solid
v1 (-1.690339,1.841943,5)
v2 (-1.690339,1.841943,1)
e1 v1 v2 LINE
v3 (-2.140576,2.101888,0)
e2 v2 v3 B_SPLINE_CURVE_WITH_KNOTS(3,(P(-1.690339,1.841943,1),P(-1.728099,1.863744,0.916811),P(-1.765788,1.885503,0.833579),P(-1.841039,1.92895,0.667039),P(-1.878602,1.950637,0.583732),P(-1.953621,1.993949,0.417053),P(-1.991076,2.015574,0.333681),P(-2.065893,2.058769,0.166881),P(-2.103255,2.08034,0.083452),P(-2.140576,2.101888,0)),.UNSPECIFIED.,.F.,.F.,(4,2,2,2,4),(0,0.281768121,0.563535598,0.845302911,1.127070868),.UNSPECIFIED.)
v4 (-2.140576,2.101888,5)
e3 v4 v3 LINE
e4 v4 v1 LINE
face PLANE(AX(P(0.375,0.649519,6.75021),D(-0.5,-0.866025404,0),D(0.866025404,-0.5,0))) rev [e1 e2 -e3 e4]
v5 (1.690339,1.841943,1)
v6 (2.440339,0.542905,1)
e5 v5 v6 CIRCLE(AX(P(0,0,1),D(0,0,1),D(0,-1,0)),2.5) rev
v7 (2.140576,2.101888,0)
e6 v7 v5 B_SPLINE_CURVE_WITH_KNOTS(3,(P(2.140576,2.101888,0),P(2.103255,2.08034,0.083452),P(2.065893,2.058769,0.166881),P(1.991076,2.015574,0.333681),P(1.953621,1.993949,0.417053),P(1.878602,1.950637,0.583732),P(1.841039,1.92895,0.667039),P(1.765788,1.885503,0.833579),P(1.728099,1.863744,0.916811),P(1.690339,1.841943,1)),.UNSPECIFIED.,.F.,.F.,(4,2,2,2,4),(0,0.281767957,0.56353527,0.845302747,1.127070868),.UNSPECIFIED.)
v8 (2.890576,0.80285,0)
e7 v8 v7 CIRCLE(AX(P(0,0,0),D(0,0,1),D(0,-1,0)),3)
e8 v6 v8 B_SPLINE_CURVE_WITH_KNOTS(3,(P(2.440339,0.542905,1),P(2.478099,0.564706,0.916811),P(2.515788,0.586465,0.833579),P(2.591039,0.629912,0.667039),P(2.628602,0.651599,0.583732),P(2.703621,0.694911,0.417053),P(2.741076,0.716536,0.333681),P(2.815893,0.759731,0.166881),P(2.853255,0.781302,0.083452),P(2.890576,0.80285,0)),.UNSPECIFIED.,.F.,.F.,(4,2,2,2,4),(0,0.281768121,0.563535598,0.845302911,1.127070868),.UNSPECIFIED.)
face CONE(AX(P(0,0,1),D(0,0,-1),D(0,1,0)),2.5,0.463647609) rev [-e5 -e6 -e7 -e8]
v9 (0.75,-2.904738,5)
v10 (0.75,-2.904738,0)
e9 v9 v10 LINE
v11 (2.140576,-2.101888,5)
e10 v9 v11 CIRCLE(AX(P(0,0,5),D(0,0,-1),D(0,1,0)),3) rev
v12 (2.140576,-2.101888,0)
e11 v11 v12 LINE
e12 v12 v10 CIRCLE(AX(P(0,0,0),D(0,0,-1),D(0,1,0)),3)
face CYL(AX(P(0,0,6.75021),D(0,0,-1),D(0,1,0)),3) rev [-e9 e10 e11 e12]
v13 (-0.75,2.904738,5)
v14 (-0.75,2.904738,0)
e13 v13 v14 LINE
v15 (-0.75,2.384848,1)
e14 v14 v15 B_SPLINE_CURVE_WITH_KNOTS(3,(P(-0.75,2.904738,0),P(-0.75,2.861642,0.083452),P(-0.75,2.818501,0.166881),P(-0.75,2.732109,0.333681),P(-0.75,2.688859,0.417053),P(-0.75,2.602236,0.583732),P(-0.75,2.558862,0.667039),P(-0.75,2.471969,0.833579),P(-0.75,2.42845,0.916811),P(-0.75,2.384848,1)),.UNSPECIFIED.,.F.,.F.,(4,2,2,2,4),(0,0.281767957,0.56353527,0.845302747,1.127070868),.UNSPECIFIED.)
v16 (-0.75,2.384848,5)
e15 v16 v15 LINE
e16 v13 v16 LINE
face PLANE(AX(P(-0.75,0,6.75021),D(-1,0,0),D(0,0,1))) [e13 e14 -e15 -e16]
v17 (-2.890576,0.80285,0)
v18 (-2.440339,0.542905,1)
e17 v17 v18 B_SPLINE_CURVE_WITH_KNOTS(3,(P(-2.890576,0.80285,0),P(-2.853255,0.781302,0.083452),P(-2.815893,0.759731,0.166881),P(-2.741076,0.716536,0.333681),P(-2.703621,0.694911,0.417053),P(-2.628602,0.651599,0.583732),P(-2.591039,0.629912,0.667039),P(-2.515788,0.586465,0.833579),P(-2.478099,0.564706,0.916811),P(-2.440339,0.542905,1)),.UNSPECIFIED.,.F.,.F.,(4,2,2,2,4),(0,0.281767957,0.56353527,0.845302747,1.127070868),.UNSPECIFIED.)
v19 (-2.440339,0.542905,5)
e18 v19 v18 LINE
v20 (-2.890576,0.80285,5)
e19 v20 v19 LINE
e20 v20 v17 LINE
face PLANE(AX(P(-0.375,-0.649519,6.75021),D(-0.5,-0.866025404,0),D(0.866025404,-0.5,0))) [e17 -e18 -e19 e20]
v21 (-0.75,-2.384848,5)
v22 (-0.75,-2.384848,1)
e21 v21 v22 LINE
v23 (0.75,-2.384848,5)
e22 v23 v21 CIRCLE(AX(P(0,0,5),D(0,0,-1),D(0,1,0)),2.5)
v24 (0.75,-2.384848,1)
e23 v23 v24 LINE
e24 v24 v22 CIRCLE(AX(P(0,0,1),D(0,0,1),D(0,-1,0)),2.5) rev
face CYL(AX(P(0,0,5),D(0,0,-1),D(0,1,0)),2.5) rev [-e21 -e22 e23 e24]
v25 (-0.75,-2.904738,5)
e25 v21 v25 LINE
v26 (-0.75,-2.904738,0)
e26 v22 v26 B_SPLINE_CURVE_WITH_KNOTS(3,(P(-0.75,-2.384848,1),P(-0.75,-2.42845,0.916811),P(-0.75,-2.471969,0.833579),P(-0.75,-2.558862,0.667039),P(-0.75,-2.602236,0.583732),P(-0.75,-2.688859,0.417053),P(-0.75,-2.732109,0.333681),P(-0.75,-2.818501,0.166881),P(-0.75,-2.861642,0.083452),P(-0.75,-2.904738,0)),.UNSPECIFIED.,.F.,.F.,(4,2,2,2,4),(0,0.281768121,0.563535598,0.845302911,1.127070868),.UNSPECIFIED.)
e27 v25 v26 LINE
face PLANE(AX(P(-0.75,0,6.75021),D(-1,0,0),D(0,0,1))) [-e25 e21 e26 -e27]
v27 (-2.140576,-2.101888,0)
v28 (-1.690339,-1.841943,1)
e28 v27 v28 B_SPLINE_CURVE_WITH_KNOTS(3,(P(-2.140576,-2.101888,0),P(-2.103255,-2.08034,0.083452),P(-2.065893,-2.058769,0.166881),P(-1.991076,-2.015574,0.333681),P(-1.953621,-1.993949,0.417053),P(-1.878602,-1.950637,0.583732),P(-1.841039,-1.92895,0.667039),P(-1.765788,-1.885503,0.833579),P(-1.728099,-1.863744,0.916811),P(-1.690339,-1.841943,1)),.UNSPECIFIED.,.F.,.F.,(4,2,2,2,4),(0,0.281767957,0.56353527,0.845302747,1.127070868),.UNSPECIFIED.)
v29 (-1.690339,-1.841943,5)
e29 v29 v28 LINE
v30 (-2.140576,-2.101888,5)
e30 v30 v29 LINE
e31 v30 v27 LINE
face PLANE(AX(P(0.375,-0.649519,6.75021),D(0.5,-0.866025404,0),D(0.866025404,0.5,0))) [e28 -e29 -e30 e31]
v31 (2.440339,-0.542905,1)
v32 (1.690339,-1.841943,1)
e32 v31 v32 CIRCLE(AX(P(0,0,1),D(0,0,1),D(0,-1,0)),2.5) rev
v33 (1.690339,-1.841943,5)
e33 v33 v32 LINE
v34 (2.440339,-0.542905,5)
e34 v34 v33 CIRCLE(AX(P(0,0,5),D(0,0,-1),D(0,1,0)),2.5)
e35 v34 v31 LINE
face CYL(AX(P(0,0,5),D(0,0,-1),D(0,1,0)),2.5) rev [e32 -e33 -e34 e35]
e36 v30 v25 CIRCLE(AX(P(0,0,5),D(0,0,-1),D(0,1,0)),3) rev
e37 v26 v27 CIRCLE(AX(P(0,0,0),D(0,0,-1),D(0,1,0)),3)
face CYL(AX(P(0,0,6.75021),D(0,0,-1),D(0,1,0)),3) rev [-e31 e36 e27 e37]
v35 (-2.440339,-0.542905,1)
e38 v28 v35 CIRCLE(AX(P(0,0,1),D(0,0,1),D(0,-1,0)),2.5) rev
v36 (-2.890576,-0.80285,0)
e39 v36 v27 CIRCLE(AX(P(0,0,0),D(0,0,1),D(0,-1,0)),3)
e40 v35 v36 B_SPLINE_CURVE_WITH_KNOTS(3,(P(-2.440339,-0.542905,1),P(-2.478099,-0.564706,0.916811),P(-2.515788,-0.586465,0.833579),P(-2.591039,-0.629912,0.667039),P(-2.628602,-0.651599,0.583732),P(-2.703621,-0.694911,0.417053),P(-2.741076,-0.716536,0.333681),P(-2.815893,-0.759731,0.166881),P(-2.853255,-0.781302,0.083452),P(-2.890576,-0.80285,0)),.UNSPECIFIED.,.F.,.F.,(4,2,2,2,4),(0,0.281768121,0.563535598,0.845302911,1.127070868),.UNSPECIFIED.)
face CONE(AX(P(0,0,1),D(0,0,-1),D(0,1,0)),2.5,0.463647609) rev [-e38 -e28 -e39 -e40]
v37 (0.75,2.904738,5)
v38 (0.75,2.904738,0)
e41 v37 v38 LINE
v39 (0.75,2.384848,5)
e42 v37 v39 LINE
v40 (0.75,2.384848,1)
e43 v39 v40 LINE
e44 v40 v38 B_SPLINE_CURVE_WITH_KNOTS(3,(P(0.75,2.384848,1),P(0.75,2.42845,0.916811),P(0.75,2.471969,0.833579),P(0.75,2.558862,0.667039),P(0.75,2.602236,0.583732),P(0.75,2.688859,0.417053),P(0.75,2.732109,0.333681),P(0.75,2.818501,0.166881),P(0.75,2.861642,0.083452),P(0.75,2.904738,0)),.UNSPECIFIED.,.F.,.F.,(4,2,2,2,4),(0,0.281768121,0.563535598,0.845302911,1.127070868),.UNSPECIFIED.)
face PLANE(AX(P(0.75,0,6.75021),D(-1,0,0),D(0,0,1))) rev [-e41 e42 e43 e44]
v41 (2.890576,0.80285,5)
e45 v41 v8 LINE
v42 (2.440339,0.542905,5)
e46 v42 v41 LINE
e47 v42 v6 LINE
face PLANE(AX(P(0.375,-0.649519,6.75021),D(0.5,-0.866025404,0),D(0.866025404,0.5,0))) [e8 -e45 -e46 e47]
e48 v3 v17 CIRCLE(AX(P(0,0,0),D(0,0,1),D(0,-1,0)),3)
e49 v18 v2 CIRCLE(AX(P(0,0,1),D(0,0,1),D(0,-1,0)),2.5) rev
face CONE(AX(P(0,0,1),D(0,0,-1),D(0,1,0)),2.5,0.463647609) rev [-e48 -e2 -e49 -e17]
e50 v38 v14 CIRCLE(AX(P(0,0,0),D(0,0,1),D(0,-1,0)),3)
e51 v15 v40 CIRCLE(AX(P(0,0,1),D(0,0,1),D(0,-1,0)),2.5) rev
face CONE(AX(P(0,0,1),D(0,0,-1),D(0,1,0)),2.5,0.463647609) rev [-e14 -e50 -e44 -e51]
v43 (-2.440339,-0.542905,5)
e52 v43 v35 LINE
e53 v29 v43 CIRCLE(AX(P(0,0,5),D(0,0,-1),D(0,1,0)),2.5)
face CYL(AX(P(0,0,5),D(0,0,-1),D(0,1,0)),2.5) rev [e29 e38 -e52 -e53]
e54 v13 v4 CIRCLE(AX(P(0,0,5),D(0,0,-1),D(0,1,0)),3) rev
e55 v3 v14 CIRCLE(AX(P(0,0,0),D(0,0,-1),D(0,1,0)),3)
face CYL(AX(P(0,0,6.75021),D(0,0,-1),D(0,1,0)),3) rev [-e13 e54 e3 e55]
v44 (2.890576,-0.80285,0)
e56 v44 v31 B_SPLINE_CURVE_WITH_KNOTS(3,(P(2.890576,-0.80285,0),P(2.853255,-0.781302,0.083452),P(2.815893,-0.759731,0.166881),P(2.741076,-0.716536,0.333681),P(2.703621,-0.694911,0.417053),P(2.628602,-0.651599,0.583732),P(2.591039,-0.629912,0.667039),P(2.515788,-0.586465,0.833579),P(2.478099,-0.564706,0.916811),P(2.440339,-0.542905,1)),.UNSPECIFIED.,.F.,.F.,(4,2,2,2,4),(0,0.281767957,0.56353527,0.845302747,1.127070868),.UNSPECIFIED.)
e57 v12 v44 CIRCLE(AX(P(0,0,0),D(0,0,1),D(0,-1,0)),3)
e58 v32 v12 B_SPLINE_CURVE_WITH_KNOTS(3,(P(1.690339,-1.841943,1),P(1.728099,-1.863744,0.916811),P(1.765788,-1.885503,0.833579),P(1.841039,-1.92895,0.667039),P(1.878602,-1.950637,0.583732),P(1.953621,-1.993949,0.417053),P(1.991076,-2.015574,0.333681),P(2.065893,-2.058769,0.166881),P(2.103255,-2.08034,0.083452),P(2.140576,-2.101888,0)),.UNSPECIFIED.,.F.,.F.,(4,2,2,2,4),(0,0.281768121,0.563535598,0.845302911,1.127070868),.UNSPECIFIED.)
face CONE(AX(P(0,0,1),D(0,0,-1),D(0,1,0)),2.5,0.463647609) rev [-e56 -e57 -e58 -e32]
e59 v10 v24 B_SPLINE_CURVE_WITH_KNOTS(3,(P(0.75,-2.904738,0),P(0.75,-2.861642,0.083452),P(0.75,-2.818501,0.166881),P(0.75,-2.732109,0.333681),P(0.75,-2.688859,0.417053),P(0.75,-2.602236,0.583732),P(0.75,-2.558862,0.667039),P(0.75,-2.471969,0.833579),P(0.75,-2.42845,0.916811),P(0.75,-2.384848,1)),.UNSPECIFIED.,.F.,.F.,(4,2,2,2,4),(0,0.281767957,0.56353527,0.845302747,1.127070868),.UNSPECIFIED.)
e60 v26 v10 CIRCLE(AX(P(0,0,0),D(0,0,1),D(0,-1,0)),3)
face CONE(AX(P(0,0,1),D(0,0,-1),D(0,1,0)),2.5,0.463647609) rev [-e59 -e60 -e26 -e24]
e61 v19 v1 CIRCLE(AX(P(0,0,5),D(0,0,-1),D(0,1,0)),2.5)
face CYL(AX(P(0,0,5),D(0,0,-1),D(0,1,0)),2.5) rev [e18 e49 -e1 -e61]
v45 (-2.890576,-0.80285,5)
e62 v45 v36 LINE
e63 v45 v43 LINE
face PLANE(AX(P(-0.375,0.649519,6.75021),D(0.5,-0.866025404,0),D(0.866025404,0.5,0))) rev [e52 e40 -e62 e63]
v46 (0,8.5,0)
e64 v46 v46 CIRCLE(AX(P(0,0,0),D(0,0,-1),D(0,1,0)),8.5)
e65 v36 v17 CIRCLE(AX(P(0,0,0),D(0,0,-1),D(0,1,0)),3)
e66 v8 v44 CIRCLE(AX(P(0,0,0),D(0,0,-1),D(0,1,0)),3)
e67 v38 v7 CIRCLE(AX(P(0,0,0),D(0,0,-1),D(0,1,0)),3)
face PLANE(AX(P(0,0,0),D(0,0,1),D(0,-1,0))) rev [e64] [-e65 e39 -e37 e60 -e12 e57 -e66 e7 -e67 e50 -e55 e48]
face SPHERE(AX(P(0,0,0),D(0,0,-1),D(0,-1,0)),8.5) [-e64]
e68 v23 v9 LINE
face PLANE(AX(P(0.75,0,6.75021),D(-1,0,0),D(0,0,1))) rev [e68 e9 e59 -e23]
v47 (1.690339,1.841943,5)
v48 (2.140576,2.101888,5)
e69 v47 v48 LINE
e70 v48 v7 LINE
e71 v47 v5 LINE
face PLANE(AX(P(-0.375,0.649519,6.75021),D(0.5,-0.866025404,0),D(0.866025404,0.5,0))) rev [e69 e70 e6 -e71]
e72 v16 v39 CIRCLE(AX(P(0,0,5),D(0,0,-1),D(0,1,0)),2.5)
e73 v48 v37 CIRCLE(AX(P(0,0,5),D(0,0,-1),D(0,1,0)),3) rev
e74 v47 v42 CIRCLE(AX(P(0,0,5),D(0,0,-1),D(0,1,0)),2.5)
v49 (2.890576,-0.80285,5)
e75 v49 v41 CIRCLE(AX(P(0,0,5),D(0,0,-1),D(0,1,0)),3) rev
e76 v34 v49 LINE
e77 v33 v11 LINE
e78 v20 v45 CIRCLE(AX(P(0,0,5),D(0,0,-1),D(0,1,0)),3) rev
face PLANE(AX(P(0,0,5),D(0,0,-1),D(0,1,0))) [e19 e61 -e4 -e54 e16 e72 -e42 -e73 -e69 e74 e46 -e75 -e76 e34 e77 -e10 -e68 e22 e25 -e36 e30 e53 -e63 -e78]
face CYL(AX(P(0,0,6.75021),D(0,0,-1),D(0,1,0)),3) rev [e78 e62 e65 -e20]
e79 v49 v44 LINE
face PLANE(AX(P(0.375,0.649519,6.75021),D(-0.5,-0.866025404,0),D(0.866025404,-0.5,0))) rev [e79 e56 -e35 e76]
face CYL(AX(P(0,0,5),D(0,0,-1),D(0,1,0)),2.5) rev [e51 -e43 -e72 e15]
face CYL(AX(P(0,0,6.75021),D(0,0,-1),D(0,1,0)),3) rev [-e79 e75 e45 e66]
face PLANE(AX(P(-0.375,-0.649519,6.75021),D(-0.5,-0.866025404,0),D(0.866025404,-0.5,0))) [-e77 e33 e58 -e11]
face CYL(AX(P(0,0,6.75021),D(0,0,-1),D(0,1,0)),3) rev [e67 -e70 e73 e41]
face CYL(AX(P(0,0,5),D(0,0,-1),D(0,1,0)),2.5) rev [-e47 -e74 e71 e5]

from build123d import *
from OCP.BRepFilletAPI import BRepFilletAPI_MakeChamfer

# Parameters (mm, degrees)
SKETCH2_R          = 2.5
CUT_EXTRUDE1_DEPTH = 5
CUT_EXTRUDE2_DEPTH = 5
CHAMFER2_SIZE      = 0.5
CHAMFER2_SIZE_2    = 1


with BuildPart() as part:
    # Sketch1 → Revolve1 (revolve)
    with BuildSketch(Plane(origin=(0, 0, 0), x_dir=(0, 0, -1), z_dir=(1, 0, 0))):
        with BuildLine():
            Line((0, 0), (0, -8.5))
            ThreePointArc((0, -8.5), (-6.01040764, -6.01040764), (-8.5, 0))
            Line((-8.5, 0), (0, 0))
        make_face()
    revolve(axis=Axis((0, 0, 0), (0, 0, 1)))

    # Sketch2 → Cut-Extrude1 (cut)
    with BuildSketch(Plane(origin=(0, 0, 0), x_dir=(-1, 0, 0), z_dir=(0, 0, -1))):
        with Locations(Location((0, 0, 0), (0, 0, 90))):
            Circle(SKETCH2_R)
    extrude(amount=-CUT_EXTRUDE1_DEPTH, mode=Mode.SUBTRACT)

    # Sketch3 → Cut-Extrude2 (cut)
    with BuildSketch(Plane(origin=(0, 0, 0), x_dir=(-1, 0, 0), z_dir=(0, 0, -1))):
        with BuildLine():
            ThreePointArc((-0.75, 2.90473751), (-1.5, 2.598076211), (-2.140576475, 2.101887808))
            Line((-2.140576475, 2.101887808), (-1.690338955, 1.841943055))
            ThreePointArc((-1.690338955, 1.841943055), (-1.25, 2.165063509), (-0.75, 2.384848004))
            Line((-0.75, 2.384848004), (-0.75, 2.90473751))
        make_face()
        with BuildLine():
            Line((1.690338955, 1.841943055), (2.140576475, 2.101887808))
            ThreePointArc((2.140576475, 2.101887808), (1.5, 2.598076211), (0.75, 2.90473751))
            Line((0.75, 2.90473751), (0.75, 2.384848004))
            ThreePointArc((0.75, 2.384848004), (1.25, 2.165063509), (1.690338955, 1.841943055))
        make_face()
        with BuildLine():
            Line((2.440338955, -0.542904949), (2.890576475, -0.802849702))
            ThreePointArc((2.890576475, -0.802849702), (2.972518244, -0.405136135), (3, 0))
            ThreePointArc((3, 0), (2.972518244, 0.405136135), (2.890576475, 0.802849702))
            Line((2.890576475, 0.802849702), (2.440338955, 0.542904949))
            ThreePointArc((2.440338955, 0.542904949), (2.485039978, 0.273086627), (2.5, 0))
            ThreePointArc((2.5, 0), (2.485039978, -0.273086627), (2.440338955, -0.542904949))
        make_face()
        with BuildLine():
            Line((0.75, -2.384848004), (0.75, -2.90473751))
            ThreePointArc((0.75, -2.90473751), (1.5, -2.598076211), (2.140576475, -2.101887808))
            Line((2.140576475, -2.101887808), (1.690338955, -1.841943055))
            ThreePointArc((1.690338955, -1.841943055), (1.25, -2.165063509), (0.75, -2.384848004))
        make_face()
        with BuildLine():
            ThreePointArc((-2.140576475, -2.101887808), (-1.5, -2.598076211), (-0.75, -2.90473751))
            Line((-0.75, -2.90473751), (-0.75, -2.384848004))
            ThreePointArc((-0.75, -2.384848004), (-1.25, -2.165063509), (-1.690338955, -1.841943055))
            Line((-1.690338955, -1.841943055), (-2.140576475, -2.101887808))
        make_face()
        with BuildLine():
            ThreePointArc((-2.890576475, 0.802849702), (-3, 0), (-2.890576475, -0.802849702))
            Line((-2.890576475, -0.802849702), (-2.440338955, -0.542904949))
            ThreePointArc((-2.440338955, -0.542904949), (-2.5, 0), (-2.440338955, 0.542904949))
            Line((-2.440338955, 0.542904949), (-2.890576475, 0.802849702))
        make_face()
    extrude(amount=-CUT_EXTRUDE2_DEPTH, mode=Mode.SUBTRACT)

    # Chamfer2
    chamfer2_edges_1 = [part.edges().sort_by_distance(p)[0] for p in [
        (-2.165063509, 1.25, 0),
    ]]
    chamfer2_side_1 = [part.faces().sort_by_distance(p)[0] for p in [
        (-2.173723763, 1.255, 0),
    ]]
    chamfer2_edges_2 = [part.edges().sort_by_distance(p)[0] for p in [
        (2.165063509, -1.25, 0),
    ]]
    chamfer2_side_2 = [part.faces().sort_by_distance(p)[0] for p in [
        (2.173723763, -1.255, 0),
    ]]
    chamfer2_edges_3 = [part.edges().sort_by_distance(p)[0] for p in [
        (0, 2.5, 0),
    ]]
    chamfer2_side_3 = [part.faces().sort_by_distance(p)[0] for p in [
        (0, 2.51, 0),
    ]]
    chamfer2_edges_4 = [part.edges().sort_by_distance(p)[0] for p in [
        (0, -2.5, 0),
    ]]
    chamfer2_side_4 = [part.faces().sort_by_distance(p)[0] for p in [
        (0, -2.51, 0),
    ]]
    chamfer2_edges_5 = [part.edges().sort_by_distance(p)[0] for p in [
        (2.165063509, 1.25, 0),
    ]]
    chamfer2_side_5 = [part.faces().sort_by_distance(p)[0] for p in [
        (2.173723763, 1.255, 0),
    ]]
    chamfer2_edges_6 = [part.edges().sort_by_distance(p)[0] for p in [
        (-2.165063509, -1.25, 0),
    ]]
    chamfer2_side_6 = [part.faces().sort_by_distance(p)[0] for p in [
        (-2.173723763, -1.255, 0),
    ]]
    chamfer2 = BRepFilletAPI_MakeChamfer(part.part.solid().wrapped)
    for e in chamfer2_edges_1:
        chamfer2.Add(CHAMFER2_SIZE - 0.0001, CHAMFER2_SIZE_2 - 0.0001, e.wrapped, chamfer2_side_1[0].wrapped)
    for e in chamfer2_edges_2:
        chamfer2.Add(CHAMFER2_SIZE - 0.0001, CHAMFER2_SIZE_2 - 0.0001, e.wrapped, chamfer2_side_2[0].wrapped)
    for e in chamfer2_edges_3:
        chamfer2.Add(CHAMFER2_SIZE - 0.0001, CHAMFER2_SIZE_2 - 0.0001, e.wrapped, chamfer2_side_3[0].wrapped)
    for e in chamfer2_edges_4:
        chamfer2.Add(CHAMFER2_SIZE - 0.0001, CHAMFER2_SIZE_2 - 0.0001, e.wrapped, chamfer2_side_4[0].wrapped)
    for e in chamfer2_edges_5:
        chamfer2.Add(CHAMFER2_SIZE - 0.0001, CHAMFER2_SIZE_2 - 0.0001, e.wrapped, chamfer2_side_5[0].wrapped)
    for e in chamfer2_edges_6:
        chamfer2.Add(CHAMFER2_SIZE - 0.0001, CHAMFER2_SIZE_2 - 0.0001, e.wrapped, chamfer2_side_6[0].wrapped)
    add(Compound.cast(chamfer2.Shape()), mode=Mode.REPLACE)  # a hair under: the kernel refuses the full size


solid = part.part
